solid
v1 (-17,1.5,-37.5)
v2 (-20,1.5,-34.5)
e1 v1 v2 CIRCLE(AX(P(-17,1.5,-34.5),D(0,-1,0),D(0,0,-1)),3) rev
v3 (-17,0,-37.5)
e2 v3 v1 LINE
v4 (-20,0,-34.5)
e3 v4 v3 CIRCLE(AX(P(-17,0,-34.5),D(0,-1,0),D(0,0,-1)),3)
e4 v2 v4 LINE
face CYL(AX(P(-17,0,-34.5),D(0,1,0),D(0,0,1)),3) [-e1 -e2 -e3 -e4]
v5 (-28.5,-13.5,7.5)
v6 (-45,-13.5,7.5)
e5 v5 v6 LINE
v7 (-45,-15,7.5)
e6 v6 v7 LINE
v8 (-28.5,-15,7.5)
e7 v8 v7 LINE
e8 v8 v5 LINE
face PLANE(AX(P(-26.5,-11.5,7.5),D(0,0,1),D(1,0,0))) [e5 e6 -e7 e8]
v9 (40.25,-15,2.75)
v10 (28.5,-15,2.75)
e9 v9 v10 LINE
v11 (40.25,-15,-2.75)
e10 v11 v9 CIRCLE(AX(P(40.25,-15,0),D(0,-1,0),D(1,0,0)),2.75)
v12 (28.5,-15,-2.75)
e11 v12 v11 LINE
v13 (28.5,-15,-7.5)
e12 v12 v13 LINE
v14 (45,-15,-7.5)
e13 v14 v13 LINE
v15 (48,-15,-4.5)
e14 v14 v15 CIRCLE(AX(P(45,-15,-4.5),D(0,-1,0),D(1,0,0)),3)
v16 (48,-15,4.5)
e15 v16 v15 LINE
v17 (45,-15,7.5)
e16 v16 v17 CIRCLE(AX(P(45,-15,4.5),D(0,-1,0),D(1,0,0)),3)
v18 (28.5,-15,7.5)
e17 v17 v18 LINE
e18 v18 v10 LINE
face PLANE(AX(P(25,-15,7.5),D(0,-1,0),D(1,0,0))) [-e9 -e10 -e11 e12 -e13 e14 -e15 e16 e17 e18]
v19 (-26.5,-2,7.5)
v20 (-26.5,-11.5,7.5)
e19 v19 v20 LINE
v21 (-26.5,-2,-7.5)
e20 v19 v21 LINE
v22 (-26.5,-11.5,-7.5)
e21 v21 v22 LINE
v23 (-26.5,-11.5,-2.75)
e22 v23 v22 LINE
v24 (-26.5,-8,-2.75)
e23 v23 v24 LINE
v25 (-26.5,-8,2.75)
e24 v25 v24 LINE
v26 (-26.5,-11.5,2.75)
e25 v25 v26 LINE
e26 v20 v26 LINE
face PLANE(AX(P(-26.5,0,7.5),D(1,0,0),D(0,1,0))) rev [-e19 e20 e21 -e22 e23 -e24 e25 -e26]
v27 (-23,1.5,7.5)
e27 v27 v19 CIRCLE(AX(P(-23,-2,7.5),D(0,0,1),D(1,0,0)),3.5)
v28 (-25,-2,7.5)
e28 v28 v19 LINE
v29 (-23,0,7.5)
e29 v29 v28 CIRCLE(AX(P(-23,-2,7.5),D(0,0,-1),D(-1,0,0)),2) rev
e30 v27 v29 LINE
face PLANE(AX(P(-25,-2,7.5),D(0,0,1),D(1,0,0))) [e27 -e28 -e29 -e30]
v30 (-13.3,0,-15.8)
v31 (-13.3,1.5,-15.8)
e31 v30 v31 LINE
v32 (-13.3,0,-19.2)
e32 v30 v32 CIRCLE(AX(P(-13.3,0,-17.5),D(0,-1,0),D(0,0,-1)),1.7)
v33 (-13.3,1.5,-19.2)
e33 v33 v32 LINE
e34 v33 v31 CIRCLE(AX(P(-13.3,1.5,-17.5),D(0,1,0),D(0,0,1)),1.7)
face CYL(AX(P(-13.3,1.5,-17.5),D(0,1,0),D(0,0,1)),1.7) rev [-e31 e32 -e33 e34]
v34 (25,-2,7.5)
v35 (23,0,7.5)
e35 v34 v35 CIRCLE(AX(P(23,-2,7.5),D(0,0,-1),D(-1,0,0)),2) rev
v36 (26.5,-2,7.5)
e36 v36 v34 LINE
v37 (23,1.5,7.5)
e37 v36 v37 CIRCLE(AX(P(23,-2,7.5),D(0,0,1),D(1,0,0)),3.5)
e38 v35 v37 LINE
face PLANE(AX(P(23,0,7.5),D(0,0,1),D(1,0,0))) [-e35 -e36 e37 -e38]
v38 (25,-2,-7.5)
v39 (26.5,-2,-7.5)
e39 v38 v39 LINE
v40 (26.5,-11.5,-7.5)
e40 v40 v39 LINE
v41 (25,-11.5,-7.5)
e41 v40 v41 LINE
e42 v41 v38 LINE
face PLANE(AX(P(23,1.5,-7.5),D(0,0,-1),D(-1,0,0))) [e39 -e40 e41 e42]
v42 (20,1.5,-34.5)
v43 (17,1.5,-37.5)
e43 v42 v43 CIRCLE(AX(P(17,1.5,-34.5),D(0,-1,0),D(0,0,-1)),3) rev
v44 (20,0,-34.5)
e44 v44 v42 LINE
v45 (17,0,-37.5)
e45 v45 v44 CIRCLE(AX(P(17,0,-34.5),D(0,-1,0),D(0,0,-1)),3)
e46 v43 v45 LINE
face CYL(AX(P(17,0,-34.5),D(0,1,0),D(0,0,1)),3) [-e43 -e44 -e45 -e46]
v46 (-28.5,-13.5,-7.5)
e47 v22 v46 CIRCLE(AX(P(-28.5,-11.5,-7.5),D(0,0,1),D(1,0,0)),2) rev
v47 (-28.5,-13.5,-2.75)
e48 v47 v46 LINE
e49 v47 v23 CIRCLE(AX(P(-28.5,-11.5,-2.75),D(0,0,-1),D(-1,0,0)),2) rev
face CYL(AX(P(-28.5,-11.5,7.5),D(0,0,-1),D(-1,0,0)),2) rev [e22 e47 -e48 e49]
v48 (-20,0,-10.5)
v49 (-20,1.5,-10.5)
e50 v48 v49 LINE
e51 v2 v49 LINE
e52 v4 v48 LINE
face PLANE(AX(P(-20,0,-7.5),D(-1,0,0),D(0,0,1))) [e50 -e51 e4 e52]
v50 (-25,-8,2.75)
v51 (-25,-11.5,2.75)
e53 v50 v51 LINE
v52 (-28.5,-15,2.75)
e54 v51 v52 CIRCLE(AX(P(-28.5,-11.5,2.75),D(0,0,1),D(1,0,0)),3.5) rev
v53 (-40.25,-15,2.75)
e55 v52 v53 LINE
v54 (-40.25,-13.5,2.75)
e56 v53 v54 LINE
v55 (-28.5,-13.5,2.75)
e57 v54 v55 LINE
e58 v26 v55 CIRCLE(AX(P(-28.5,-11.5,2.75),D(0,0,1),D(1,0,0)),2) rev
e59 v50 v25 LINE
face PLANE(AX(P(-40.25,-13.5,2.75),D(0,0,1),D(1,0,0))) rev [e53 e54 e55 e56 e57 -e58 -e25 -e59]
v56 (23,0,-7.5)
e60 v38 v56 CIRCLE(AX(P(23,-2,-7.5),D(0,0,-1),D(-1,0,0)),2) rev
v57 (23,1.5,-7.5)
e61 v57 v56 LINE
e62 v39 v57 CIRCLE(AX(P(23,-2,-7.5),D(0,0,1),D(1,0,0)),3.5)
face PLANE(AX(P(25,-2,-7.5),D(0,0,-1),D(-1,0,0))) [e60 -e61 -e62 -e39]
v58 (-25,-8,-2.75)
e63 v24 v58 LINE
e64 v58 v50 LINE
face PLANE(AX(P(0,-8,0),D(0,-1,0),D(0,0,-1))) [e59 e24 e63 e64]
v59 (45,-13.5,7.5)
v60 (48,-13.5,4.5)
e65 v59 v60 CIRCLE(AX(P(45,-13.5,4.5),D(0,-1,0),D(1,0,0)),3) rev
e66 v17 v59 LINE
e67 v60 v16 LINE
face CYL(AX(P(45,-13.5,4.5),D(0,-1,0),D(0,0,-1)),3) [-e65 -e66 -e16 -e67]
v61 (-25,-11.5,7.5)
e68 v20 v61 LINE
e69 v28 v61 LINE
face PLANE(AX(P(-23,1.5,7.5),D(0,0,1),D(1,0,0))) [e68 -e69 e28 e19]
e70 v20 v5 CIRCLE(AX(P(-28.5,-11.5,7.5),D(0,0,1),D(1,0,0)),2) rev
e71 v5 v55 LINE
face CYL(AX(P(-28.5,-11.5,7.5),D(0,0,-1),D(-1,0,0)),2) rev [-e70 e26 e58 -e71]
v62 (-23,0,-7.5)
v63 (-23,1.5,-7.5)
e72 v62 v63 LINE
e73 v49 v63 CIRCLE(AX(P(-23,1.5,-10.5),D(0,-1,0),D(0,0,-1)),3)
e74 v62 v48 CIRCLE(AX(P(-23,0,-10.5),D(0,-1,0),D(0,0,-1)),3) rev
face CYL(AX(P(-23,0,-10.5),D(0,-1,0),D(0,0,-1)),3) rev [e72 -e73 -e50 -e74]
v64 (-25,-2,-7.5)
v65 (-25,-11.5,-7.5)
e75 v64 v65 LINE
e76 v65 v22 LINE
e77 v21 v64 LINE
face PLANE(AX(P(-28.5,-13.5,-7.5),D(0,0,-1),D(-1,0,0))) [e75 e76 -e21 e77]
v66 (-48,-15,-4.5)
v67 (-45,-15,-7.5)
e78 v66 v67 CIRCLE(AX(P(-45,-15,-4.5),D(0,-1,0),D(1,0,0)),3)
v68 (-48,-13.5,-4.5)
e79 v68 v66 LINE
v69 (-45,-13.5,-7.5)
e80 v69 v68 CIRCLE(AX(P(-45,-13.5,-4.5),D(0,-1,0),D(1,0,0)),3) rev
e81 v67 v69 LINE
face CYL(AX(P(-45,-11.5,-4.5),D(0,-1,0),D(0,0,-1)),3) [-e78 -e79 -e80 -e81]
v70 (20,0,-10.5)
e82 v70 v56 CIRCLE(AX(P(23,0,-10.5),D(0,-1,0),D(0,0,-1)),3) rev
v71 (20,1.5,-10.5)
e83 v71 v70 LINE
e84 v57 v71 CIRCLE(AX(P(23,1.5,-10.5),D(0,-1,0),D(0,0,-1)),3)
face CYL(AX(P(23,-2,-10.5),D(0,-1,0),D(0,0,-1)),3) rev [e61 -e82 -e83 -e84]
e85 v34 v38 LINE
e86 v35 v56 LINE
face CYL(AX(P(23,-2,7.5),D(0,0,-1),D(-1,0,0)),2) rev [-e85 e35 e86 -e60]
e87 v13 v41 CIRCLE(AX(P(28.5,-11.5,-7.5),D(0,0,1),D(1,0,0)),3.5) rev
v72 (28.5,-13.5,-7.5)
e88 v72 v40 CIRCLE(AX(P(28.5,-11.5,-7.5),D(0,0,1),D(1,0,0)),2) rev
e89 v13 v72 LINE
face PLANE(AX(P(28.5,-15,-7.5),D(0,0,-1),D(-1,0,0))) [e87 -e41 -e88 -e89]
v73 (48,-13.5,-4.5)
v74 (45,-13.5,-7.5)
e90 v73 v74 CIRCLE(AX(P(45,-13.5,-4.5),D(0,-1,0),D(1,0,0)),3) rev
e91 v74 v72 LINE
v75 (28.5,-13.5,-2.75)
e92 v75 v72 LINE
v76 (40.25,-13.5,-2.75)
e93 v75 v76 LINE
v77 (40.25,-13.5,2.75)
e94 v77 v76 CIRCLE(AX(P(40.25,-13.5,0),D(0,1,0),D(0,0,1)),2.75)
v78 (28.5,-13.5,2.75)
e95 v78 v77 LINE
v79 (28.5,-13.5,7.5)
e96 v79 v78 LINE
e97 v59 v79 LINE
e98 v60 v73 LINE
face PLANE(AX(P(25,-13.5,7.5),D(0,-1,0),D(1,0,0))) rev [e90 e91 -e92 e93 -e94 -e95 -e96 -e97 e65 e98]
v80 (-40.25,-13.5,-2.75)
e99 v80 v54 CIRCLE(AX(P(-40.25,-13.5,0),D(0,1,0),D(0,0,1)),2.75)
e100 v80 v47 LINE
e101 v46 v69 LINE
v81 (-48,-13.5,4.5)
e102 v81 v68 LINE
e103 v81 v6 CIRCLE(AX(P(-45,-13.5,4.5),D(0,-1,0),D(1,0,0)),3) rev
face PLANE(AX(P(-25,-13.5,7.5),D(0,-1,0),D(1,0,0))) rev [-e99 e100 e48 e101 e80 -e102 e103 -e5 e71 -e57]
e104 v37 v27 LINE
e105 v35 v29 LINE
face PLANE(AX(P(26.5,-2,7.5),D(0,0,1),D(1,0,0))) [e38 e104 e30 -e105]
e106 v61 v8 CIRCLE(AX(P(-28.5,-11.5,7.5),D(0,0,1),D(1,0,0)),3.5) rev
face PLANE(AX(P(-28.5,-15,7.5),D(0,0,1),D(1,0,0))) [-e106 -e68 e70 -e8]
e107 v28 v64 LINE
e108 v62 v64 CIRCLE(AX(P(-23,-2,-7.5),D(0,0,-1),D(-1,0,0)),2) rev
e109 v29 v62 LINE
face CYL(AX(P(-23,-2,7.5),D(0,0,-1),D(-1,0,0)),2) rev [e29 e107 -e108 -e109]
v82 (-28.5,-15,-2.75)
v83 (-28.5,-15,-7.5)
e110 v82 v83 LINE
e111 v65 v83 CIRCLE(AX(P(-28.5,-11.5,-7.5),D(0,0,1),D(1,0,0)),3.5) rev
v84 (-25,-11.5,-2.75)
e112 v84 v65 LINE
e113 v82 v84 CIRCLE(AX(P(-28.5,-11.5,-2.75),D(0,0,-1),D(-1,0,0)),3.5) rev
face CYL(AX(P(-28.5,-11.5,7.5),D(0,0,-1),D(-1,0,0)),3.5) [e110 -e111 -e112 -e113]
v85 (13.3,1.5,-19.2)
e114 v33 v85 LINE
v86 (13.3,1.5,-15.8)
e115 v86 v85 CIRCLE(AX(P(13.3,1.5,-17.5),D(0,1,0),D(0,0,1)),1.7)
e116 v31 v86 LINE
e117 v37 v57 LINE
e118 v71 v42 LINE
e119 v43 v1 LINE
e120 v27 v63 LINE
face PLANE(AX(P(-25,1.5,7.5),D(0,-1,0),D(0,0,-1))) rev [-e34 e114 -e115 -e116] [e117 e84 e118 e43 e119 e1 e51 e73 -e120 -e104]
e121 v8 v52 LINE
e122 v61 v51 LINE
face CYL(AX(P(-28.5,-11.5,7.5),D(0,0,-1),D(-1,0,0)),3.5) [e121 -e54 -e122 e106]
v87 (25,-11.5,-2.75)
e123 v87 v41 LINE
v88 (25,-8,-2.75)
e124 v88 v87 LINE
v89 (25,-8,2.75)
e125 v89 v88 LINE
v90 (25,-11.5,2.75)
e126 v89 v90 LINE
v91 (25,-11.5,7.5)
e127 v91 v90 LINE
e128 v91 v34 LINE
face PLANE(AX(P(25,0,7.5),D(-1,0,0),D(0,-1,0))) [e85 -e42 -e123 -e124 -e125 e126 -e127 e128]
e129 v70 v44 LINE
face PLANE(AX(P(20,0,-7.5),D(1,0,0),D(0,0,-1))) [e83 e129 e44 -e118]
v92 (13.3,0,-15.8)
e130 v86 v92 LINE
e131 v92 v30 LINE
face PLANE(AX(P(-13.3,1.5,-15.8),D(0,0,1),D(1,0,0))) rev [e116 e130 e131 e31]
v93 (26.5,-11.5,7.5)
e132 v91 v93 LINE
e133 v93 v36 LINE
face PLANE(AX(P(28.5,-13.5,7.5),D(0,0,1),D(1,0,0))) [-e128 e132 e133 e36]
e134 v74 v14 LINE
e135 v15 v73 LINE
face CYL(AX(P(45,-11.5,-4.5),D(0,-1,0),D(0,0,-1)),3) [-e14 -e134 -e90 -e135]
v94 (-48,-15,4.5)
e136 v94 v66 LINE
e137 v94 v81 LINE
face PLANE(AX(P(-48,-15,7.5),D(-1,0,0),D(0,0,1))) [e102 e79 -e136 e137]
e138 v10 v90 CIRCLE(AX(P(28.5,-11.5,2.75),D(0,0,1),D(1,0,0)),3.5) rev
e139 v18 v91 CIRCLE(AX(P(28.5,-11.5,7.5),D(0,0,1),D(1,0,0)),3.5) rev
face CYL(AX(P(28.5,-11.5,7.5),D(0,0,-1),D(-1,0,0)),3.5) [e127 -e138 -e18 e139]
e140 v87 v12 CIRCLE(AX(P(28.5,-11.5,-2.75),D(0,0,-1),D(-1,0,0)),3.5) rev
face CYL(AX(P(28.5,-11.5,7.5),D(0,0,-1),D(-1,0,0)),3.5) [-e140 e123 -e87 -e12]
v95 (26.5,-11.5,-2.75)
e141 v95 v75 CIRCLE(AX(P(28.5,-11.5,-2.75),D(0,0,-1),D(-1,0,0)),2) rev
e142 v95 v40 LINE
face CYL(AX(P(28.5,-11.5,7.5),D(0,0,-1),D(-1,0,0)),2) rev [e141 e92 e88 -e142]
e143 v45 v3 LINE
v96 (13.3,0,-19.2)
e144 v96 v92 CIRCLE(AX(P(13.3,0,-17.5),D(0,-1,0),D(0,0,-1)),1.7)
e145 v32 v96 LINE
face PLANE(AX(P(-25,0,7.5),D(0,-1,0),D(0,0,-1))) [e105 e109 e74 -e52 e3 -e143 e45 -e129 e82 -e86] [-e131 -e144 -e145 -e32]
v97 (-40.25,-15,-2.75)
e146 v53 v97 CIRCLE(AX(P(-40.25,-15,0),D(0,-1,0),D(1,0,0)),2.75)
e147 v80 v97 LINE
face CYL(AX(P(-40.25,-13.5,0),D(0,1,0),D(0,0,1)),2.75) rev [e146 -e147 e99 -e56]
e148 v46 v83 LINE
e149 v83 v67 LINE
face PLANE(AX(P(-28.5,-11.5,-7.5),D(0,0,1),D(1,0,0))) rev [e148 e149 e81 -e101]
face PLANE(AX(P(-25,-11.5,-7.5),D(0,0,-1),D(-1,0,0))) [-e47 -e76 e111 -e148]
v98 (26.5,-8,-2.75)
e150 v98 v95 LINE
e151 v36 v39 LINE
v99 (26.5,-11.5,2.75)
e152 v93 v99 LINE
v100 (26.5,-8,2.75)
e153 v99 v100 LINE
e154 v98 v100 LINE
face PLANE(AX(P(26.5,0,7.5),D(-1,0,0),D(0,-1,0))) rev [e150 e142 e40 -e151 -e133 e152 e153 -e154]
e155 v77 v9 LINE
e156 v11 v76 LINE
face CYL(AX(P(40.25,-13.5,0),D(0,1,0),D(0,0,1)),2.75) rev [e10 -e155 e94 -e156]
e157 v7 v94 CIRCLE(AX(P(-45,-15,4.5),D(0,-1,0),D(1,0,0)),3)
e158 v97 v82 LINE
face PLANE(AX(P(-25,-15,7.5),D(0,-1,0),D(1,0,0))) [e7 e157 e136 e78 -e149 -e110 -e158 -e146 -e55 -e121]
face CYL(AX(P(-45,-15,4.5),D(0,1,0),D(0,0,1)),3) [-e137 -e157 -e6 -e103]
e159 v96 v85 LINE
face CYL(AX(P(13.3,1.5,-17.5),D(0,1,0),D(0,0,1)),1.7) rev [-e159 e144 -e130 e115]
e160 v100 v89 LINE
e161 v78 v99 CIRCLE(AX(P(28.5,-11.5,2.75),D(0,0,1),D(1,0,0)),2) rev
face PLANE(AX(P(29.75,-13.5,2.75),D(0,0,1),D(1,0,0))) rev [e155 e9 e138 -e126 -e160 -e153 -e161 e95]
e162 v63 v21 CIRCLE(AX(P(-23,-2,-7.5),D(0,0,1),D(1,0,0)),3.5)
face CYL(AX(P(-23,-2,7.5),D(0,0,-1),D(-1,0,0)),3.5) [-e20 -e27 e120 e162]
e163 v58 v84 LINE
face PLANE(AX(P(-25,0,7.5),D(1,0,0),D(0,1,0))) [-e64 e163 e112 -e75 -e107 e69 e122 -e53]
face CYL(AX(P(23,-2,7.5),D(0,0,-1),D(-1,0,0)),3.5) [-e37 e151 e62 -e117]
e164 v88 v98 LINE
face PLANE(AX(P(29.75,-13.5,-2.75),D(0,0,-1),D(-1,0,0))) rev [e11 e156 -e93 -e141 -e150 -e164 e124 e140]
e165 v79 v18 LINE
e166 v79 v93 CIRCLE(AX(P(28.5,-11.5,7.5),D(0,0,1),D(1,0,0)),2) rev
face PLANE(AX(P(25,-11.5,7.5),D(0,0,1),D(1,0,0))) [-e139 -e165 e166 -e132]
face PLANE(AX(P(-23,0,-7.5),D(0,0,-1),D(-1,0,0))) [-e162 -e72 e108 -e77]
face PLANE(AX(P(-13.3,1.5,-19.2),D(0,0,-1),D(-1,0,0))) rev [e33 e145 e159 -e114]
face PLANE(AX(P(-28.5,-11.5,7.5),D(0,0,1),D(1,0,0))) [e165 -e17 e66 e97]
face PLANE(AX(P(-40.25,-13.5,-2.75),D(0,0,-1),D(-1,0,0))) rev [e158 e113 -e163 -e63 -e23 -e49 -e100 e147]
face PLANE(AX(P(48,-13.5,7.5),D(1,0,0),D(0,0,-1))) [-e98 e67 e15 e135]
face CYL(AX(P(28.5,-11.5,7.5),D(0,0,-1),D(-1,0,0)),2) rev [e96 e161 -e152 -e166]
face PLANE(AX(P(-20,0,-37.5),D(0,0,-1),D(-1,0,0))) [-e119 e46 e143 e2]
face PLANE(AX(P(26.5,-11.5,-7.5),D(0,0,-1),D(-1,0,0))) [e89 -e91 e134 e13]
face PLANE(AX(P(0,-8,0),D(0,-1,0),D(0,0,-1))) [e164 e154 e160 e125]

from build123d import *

# Parameters (mm, degrees)
ODGI_CIE_BAZOWE1_DEPTH      = 7.5
SZCZELINA_START             = -15
SZCZELINA_POD_RUB_M51_DEPTH = 1.5
SZKIC8_W                    = 40
SZKIC8_H                    = 30
WYPUST1_DEPTH               = 1.5
SZCZELINA_POD_RUB_M31_DEPTH = 1.5
SZKIC13_W                   = 4.75
SZKIC13_H                   = 5.5
WYTNIJ_WYCI_GNI_CIE1_DEPTH  = 7
ZAOKR_GLENIE1_R             = 3


# Read off the part's stored shape, not the designer's step: Szczelina pod śrubę M51, Szczelina pod śrubę M31
# Sheet-metal steps are written as plain solids
with BuildPart() as part:
    # Szkic1 → Odgięcie bazowe1 (new, symmetric)
    with BuildSketch(Plane.XY):
        with BuildLine():
            Line((-48, -15), (-28.5, -15))
            ThreePointArc((-28.5, -15), (-26.025126266, -13.974873734), (-25, -11.5))
            Line((-25, -11.5), (-25, -2))
            ThreePointArc((-25, -2), (-24.414213562, -0.585786438), (-23, 0))
            Line((-23, 0), (23, 0))
            ThreePointArc((23, 0), (24.414213562, -0.585786438), (25, -2))
            Line((25, -2), (25, -11.5))
            ThreePointArc((25, -11.5), (26.025126266, -13.974873734), (28.5, -15))
            Line((28.5, -15), (48, -15))
            Line((48, -15), (48, -13.5))
            Line((48, -13.5), (28.5, -13.5))
            ThreePointArc((28.5, -13.5), (27.085786438, -12.914213562), (26.5, -11.5))
            Line((26.5, -11.5), (26.5, -2))
            ThreePointArc((26.5, -2), (25.474873734, 0.474873734), (23, 1.5))
            Line((23, 1.5), (-23, 1.5))
            ThreePointArc((-23, 1.5), (-25.474873734, 0.474873734), (-26.5, -2))
            Line((-26.5, -2), (-26.5, -11.5))
            ThreePointArc((-26.5, -11.5), (-27.085786438, -12.914213562), (-28.5, -13.5))
            Line((-28.5, -13.5), (-48, -13.5))
            Line((-48, -13.5), (-48, -15))
        make_face()
    extrude(amount=ODGI_CIE_BAZOWE1_DEPTH, both=True)

    # Szczelina pod śrubę M51 outline → Szczelina pod śrubę M51 (cut)
    with BuildSketch(Plane(origin=(0, 0, 0), x_dir=(1, 0, 0), z_dir=(0, 1, 0)).offset(SZCZELINA_START)):
        with BuildLine():
            Line((29.75, -2.75), (40.25, -2.75))
            ThreePointArc((40.25, -2.75), (43, 0), (40.25, 2.75))
            Line((40.25, 2.75), (29.75, 2.75))
            ThreePointArc((29.75, 2.75), (27, 0), (29.75, -2.75))
        make_face()
        with BuildLine():
            ThreePointArc((-29.75, -2.75), (-27, 0), (-29.75, 2.75))
            Line((-29.75, 2.75), (-40.25, 2.75))
            ThreePointArc((-40.25, 2.75), (-43, 0), (-40.25, -2.75))
            Line((-40.25, -2.75), (-29.75, -2.75))
        make_face()
    extrude(amount=SZCZELINA_POD_RUB_M51_DEPTH, mode=Mode.SUBTRACT)

    # Szkic8 → Wypust1 (add)
    with BuildSketch(Plane(origin=(0, 1.5, 0), x_dir=(1, 0, 0), z_dir=(0, 1, 0))):
        with Locations((0, 22.5)):
            Rectangle(SZKIC8_W, SZKIC8_H)
    extrude(amount=-WYPUST1_DEPTH)

    # Szczelina pod śrubę M31 outline → Szczelina pod śrubę M31 (cut)
    with BuildSketch(Plane(origin=(0, 0, 0), x_dir=(1, 0, 0), z_dir=(0, 1, 0))):
        with BuildLine():
            Line((-13.3, 15.8), (13.3, 15.8))
            ThreePointArc((13.3, 15.8), (15, 17.5), (13.3, 19.2))
            Line((13.3, 19.2), (-13.3, 19.2))
            ThreePointArc((-13.3, 19.2), (-15, 17.5), (-13.3, 15.8))
        make_face()
    extrude(amount=SZCZELINA_POD_RUB_M31_DEPTH, mode=Mode.SUBTRACT)

    # Szkic13 → Wytnij-wyciągnięcie1 (cut)
    with BuildSketch(Plane.XZ.offset(15)):
        with Locations((-27.375, 0)):
            Rectangle(SZKIC13_W, SZKIC13_H)
        with Locations((27.375, 0)):
            Rectangle(SZKIC13_W, SZKIC13_H)
    extrude(amount=-WYTNIJ_WYCI_GNI_CIE1_DEPTH, mode=Mode.SUBTRACT)

    # Zaokrąglenie1
    zaokr_glenie1_edges = [part.edges().sort_by_distance(p)[0] for p in [
        (48, -14.25, 7.5),
        (48, -14.25, -7.5),
        (20, 0.75, -37.5),
        (-20, 0.75, -37.5),
        (-48, -14.25, -7.5),
        (-48, -14.25, 7.5),
        (20, 0.75, -7.5),
        (-20, 0.75, -7.5),
    ]]
    fillet(zaokr_glenie1_edges, radius=ZAOKR_GLENIE1_R)


solid = part.part
